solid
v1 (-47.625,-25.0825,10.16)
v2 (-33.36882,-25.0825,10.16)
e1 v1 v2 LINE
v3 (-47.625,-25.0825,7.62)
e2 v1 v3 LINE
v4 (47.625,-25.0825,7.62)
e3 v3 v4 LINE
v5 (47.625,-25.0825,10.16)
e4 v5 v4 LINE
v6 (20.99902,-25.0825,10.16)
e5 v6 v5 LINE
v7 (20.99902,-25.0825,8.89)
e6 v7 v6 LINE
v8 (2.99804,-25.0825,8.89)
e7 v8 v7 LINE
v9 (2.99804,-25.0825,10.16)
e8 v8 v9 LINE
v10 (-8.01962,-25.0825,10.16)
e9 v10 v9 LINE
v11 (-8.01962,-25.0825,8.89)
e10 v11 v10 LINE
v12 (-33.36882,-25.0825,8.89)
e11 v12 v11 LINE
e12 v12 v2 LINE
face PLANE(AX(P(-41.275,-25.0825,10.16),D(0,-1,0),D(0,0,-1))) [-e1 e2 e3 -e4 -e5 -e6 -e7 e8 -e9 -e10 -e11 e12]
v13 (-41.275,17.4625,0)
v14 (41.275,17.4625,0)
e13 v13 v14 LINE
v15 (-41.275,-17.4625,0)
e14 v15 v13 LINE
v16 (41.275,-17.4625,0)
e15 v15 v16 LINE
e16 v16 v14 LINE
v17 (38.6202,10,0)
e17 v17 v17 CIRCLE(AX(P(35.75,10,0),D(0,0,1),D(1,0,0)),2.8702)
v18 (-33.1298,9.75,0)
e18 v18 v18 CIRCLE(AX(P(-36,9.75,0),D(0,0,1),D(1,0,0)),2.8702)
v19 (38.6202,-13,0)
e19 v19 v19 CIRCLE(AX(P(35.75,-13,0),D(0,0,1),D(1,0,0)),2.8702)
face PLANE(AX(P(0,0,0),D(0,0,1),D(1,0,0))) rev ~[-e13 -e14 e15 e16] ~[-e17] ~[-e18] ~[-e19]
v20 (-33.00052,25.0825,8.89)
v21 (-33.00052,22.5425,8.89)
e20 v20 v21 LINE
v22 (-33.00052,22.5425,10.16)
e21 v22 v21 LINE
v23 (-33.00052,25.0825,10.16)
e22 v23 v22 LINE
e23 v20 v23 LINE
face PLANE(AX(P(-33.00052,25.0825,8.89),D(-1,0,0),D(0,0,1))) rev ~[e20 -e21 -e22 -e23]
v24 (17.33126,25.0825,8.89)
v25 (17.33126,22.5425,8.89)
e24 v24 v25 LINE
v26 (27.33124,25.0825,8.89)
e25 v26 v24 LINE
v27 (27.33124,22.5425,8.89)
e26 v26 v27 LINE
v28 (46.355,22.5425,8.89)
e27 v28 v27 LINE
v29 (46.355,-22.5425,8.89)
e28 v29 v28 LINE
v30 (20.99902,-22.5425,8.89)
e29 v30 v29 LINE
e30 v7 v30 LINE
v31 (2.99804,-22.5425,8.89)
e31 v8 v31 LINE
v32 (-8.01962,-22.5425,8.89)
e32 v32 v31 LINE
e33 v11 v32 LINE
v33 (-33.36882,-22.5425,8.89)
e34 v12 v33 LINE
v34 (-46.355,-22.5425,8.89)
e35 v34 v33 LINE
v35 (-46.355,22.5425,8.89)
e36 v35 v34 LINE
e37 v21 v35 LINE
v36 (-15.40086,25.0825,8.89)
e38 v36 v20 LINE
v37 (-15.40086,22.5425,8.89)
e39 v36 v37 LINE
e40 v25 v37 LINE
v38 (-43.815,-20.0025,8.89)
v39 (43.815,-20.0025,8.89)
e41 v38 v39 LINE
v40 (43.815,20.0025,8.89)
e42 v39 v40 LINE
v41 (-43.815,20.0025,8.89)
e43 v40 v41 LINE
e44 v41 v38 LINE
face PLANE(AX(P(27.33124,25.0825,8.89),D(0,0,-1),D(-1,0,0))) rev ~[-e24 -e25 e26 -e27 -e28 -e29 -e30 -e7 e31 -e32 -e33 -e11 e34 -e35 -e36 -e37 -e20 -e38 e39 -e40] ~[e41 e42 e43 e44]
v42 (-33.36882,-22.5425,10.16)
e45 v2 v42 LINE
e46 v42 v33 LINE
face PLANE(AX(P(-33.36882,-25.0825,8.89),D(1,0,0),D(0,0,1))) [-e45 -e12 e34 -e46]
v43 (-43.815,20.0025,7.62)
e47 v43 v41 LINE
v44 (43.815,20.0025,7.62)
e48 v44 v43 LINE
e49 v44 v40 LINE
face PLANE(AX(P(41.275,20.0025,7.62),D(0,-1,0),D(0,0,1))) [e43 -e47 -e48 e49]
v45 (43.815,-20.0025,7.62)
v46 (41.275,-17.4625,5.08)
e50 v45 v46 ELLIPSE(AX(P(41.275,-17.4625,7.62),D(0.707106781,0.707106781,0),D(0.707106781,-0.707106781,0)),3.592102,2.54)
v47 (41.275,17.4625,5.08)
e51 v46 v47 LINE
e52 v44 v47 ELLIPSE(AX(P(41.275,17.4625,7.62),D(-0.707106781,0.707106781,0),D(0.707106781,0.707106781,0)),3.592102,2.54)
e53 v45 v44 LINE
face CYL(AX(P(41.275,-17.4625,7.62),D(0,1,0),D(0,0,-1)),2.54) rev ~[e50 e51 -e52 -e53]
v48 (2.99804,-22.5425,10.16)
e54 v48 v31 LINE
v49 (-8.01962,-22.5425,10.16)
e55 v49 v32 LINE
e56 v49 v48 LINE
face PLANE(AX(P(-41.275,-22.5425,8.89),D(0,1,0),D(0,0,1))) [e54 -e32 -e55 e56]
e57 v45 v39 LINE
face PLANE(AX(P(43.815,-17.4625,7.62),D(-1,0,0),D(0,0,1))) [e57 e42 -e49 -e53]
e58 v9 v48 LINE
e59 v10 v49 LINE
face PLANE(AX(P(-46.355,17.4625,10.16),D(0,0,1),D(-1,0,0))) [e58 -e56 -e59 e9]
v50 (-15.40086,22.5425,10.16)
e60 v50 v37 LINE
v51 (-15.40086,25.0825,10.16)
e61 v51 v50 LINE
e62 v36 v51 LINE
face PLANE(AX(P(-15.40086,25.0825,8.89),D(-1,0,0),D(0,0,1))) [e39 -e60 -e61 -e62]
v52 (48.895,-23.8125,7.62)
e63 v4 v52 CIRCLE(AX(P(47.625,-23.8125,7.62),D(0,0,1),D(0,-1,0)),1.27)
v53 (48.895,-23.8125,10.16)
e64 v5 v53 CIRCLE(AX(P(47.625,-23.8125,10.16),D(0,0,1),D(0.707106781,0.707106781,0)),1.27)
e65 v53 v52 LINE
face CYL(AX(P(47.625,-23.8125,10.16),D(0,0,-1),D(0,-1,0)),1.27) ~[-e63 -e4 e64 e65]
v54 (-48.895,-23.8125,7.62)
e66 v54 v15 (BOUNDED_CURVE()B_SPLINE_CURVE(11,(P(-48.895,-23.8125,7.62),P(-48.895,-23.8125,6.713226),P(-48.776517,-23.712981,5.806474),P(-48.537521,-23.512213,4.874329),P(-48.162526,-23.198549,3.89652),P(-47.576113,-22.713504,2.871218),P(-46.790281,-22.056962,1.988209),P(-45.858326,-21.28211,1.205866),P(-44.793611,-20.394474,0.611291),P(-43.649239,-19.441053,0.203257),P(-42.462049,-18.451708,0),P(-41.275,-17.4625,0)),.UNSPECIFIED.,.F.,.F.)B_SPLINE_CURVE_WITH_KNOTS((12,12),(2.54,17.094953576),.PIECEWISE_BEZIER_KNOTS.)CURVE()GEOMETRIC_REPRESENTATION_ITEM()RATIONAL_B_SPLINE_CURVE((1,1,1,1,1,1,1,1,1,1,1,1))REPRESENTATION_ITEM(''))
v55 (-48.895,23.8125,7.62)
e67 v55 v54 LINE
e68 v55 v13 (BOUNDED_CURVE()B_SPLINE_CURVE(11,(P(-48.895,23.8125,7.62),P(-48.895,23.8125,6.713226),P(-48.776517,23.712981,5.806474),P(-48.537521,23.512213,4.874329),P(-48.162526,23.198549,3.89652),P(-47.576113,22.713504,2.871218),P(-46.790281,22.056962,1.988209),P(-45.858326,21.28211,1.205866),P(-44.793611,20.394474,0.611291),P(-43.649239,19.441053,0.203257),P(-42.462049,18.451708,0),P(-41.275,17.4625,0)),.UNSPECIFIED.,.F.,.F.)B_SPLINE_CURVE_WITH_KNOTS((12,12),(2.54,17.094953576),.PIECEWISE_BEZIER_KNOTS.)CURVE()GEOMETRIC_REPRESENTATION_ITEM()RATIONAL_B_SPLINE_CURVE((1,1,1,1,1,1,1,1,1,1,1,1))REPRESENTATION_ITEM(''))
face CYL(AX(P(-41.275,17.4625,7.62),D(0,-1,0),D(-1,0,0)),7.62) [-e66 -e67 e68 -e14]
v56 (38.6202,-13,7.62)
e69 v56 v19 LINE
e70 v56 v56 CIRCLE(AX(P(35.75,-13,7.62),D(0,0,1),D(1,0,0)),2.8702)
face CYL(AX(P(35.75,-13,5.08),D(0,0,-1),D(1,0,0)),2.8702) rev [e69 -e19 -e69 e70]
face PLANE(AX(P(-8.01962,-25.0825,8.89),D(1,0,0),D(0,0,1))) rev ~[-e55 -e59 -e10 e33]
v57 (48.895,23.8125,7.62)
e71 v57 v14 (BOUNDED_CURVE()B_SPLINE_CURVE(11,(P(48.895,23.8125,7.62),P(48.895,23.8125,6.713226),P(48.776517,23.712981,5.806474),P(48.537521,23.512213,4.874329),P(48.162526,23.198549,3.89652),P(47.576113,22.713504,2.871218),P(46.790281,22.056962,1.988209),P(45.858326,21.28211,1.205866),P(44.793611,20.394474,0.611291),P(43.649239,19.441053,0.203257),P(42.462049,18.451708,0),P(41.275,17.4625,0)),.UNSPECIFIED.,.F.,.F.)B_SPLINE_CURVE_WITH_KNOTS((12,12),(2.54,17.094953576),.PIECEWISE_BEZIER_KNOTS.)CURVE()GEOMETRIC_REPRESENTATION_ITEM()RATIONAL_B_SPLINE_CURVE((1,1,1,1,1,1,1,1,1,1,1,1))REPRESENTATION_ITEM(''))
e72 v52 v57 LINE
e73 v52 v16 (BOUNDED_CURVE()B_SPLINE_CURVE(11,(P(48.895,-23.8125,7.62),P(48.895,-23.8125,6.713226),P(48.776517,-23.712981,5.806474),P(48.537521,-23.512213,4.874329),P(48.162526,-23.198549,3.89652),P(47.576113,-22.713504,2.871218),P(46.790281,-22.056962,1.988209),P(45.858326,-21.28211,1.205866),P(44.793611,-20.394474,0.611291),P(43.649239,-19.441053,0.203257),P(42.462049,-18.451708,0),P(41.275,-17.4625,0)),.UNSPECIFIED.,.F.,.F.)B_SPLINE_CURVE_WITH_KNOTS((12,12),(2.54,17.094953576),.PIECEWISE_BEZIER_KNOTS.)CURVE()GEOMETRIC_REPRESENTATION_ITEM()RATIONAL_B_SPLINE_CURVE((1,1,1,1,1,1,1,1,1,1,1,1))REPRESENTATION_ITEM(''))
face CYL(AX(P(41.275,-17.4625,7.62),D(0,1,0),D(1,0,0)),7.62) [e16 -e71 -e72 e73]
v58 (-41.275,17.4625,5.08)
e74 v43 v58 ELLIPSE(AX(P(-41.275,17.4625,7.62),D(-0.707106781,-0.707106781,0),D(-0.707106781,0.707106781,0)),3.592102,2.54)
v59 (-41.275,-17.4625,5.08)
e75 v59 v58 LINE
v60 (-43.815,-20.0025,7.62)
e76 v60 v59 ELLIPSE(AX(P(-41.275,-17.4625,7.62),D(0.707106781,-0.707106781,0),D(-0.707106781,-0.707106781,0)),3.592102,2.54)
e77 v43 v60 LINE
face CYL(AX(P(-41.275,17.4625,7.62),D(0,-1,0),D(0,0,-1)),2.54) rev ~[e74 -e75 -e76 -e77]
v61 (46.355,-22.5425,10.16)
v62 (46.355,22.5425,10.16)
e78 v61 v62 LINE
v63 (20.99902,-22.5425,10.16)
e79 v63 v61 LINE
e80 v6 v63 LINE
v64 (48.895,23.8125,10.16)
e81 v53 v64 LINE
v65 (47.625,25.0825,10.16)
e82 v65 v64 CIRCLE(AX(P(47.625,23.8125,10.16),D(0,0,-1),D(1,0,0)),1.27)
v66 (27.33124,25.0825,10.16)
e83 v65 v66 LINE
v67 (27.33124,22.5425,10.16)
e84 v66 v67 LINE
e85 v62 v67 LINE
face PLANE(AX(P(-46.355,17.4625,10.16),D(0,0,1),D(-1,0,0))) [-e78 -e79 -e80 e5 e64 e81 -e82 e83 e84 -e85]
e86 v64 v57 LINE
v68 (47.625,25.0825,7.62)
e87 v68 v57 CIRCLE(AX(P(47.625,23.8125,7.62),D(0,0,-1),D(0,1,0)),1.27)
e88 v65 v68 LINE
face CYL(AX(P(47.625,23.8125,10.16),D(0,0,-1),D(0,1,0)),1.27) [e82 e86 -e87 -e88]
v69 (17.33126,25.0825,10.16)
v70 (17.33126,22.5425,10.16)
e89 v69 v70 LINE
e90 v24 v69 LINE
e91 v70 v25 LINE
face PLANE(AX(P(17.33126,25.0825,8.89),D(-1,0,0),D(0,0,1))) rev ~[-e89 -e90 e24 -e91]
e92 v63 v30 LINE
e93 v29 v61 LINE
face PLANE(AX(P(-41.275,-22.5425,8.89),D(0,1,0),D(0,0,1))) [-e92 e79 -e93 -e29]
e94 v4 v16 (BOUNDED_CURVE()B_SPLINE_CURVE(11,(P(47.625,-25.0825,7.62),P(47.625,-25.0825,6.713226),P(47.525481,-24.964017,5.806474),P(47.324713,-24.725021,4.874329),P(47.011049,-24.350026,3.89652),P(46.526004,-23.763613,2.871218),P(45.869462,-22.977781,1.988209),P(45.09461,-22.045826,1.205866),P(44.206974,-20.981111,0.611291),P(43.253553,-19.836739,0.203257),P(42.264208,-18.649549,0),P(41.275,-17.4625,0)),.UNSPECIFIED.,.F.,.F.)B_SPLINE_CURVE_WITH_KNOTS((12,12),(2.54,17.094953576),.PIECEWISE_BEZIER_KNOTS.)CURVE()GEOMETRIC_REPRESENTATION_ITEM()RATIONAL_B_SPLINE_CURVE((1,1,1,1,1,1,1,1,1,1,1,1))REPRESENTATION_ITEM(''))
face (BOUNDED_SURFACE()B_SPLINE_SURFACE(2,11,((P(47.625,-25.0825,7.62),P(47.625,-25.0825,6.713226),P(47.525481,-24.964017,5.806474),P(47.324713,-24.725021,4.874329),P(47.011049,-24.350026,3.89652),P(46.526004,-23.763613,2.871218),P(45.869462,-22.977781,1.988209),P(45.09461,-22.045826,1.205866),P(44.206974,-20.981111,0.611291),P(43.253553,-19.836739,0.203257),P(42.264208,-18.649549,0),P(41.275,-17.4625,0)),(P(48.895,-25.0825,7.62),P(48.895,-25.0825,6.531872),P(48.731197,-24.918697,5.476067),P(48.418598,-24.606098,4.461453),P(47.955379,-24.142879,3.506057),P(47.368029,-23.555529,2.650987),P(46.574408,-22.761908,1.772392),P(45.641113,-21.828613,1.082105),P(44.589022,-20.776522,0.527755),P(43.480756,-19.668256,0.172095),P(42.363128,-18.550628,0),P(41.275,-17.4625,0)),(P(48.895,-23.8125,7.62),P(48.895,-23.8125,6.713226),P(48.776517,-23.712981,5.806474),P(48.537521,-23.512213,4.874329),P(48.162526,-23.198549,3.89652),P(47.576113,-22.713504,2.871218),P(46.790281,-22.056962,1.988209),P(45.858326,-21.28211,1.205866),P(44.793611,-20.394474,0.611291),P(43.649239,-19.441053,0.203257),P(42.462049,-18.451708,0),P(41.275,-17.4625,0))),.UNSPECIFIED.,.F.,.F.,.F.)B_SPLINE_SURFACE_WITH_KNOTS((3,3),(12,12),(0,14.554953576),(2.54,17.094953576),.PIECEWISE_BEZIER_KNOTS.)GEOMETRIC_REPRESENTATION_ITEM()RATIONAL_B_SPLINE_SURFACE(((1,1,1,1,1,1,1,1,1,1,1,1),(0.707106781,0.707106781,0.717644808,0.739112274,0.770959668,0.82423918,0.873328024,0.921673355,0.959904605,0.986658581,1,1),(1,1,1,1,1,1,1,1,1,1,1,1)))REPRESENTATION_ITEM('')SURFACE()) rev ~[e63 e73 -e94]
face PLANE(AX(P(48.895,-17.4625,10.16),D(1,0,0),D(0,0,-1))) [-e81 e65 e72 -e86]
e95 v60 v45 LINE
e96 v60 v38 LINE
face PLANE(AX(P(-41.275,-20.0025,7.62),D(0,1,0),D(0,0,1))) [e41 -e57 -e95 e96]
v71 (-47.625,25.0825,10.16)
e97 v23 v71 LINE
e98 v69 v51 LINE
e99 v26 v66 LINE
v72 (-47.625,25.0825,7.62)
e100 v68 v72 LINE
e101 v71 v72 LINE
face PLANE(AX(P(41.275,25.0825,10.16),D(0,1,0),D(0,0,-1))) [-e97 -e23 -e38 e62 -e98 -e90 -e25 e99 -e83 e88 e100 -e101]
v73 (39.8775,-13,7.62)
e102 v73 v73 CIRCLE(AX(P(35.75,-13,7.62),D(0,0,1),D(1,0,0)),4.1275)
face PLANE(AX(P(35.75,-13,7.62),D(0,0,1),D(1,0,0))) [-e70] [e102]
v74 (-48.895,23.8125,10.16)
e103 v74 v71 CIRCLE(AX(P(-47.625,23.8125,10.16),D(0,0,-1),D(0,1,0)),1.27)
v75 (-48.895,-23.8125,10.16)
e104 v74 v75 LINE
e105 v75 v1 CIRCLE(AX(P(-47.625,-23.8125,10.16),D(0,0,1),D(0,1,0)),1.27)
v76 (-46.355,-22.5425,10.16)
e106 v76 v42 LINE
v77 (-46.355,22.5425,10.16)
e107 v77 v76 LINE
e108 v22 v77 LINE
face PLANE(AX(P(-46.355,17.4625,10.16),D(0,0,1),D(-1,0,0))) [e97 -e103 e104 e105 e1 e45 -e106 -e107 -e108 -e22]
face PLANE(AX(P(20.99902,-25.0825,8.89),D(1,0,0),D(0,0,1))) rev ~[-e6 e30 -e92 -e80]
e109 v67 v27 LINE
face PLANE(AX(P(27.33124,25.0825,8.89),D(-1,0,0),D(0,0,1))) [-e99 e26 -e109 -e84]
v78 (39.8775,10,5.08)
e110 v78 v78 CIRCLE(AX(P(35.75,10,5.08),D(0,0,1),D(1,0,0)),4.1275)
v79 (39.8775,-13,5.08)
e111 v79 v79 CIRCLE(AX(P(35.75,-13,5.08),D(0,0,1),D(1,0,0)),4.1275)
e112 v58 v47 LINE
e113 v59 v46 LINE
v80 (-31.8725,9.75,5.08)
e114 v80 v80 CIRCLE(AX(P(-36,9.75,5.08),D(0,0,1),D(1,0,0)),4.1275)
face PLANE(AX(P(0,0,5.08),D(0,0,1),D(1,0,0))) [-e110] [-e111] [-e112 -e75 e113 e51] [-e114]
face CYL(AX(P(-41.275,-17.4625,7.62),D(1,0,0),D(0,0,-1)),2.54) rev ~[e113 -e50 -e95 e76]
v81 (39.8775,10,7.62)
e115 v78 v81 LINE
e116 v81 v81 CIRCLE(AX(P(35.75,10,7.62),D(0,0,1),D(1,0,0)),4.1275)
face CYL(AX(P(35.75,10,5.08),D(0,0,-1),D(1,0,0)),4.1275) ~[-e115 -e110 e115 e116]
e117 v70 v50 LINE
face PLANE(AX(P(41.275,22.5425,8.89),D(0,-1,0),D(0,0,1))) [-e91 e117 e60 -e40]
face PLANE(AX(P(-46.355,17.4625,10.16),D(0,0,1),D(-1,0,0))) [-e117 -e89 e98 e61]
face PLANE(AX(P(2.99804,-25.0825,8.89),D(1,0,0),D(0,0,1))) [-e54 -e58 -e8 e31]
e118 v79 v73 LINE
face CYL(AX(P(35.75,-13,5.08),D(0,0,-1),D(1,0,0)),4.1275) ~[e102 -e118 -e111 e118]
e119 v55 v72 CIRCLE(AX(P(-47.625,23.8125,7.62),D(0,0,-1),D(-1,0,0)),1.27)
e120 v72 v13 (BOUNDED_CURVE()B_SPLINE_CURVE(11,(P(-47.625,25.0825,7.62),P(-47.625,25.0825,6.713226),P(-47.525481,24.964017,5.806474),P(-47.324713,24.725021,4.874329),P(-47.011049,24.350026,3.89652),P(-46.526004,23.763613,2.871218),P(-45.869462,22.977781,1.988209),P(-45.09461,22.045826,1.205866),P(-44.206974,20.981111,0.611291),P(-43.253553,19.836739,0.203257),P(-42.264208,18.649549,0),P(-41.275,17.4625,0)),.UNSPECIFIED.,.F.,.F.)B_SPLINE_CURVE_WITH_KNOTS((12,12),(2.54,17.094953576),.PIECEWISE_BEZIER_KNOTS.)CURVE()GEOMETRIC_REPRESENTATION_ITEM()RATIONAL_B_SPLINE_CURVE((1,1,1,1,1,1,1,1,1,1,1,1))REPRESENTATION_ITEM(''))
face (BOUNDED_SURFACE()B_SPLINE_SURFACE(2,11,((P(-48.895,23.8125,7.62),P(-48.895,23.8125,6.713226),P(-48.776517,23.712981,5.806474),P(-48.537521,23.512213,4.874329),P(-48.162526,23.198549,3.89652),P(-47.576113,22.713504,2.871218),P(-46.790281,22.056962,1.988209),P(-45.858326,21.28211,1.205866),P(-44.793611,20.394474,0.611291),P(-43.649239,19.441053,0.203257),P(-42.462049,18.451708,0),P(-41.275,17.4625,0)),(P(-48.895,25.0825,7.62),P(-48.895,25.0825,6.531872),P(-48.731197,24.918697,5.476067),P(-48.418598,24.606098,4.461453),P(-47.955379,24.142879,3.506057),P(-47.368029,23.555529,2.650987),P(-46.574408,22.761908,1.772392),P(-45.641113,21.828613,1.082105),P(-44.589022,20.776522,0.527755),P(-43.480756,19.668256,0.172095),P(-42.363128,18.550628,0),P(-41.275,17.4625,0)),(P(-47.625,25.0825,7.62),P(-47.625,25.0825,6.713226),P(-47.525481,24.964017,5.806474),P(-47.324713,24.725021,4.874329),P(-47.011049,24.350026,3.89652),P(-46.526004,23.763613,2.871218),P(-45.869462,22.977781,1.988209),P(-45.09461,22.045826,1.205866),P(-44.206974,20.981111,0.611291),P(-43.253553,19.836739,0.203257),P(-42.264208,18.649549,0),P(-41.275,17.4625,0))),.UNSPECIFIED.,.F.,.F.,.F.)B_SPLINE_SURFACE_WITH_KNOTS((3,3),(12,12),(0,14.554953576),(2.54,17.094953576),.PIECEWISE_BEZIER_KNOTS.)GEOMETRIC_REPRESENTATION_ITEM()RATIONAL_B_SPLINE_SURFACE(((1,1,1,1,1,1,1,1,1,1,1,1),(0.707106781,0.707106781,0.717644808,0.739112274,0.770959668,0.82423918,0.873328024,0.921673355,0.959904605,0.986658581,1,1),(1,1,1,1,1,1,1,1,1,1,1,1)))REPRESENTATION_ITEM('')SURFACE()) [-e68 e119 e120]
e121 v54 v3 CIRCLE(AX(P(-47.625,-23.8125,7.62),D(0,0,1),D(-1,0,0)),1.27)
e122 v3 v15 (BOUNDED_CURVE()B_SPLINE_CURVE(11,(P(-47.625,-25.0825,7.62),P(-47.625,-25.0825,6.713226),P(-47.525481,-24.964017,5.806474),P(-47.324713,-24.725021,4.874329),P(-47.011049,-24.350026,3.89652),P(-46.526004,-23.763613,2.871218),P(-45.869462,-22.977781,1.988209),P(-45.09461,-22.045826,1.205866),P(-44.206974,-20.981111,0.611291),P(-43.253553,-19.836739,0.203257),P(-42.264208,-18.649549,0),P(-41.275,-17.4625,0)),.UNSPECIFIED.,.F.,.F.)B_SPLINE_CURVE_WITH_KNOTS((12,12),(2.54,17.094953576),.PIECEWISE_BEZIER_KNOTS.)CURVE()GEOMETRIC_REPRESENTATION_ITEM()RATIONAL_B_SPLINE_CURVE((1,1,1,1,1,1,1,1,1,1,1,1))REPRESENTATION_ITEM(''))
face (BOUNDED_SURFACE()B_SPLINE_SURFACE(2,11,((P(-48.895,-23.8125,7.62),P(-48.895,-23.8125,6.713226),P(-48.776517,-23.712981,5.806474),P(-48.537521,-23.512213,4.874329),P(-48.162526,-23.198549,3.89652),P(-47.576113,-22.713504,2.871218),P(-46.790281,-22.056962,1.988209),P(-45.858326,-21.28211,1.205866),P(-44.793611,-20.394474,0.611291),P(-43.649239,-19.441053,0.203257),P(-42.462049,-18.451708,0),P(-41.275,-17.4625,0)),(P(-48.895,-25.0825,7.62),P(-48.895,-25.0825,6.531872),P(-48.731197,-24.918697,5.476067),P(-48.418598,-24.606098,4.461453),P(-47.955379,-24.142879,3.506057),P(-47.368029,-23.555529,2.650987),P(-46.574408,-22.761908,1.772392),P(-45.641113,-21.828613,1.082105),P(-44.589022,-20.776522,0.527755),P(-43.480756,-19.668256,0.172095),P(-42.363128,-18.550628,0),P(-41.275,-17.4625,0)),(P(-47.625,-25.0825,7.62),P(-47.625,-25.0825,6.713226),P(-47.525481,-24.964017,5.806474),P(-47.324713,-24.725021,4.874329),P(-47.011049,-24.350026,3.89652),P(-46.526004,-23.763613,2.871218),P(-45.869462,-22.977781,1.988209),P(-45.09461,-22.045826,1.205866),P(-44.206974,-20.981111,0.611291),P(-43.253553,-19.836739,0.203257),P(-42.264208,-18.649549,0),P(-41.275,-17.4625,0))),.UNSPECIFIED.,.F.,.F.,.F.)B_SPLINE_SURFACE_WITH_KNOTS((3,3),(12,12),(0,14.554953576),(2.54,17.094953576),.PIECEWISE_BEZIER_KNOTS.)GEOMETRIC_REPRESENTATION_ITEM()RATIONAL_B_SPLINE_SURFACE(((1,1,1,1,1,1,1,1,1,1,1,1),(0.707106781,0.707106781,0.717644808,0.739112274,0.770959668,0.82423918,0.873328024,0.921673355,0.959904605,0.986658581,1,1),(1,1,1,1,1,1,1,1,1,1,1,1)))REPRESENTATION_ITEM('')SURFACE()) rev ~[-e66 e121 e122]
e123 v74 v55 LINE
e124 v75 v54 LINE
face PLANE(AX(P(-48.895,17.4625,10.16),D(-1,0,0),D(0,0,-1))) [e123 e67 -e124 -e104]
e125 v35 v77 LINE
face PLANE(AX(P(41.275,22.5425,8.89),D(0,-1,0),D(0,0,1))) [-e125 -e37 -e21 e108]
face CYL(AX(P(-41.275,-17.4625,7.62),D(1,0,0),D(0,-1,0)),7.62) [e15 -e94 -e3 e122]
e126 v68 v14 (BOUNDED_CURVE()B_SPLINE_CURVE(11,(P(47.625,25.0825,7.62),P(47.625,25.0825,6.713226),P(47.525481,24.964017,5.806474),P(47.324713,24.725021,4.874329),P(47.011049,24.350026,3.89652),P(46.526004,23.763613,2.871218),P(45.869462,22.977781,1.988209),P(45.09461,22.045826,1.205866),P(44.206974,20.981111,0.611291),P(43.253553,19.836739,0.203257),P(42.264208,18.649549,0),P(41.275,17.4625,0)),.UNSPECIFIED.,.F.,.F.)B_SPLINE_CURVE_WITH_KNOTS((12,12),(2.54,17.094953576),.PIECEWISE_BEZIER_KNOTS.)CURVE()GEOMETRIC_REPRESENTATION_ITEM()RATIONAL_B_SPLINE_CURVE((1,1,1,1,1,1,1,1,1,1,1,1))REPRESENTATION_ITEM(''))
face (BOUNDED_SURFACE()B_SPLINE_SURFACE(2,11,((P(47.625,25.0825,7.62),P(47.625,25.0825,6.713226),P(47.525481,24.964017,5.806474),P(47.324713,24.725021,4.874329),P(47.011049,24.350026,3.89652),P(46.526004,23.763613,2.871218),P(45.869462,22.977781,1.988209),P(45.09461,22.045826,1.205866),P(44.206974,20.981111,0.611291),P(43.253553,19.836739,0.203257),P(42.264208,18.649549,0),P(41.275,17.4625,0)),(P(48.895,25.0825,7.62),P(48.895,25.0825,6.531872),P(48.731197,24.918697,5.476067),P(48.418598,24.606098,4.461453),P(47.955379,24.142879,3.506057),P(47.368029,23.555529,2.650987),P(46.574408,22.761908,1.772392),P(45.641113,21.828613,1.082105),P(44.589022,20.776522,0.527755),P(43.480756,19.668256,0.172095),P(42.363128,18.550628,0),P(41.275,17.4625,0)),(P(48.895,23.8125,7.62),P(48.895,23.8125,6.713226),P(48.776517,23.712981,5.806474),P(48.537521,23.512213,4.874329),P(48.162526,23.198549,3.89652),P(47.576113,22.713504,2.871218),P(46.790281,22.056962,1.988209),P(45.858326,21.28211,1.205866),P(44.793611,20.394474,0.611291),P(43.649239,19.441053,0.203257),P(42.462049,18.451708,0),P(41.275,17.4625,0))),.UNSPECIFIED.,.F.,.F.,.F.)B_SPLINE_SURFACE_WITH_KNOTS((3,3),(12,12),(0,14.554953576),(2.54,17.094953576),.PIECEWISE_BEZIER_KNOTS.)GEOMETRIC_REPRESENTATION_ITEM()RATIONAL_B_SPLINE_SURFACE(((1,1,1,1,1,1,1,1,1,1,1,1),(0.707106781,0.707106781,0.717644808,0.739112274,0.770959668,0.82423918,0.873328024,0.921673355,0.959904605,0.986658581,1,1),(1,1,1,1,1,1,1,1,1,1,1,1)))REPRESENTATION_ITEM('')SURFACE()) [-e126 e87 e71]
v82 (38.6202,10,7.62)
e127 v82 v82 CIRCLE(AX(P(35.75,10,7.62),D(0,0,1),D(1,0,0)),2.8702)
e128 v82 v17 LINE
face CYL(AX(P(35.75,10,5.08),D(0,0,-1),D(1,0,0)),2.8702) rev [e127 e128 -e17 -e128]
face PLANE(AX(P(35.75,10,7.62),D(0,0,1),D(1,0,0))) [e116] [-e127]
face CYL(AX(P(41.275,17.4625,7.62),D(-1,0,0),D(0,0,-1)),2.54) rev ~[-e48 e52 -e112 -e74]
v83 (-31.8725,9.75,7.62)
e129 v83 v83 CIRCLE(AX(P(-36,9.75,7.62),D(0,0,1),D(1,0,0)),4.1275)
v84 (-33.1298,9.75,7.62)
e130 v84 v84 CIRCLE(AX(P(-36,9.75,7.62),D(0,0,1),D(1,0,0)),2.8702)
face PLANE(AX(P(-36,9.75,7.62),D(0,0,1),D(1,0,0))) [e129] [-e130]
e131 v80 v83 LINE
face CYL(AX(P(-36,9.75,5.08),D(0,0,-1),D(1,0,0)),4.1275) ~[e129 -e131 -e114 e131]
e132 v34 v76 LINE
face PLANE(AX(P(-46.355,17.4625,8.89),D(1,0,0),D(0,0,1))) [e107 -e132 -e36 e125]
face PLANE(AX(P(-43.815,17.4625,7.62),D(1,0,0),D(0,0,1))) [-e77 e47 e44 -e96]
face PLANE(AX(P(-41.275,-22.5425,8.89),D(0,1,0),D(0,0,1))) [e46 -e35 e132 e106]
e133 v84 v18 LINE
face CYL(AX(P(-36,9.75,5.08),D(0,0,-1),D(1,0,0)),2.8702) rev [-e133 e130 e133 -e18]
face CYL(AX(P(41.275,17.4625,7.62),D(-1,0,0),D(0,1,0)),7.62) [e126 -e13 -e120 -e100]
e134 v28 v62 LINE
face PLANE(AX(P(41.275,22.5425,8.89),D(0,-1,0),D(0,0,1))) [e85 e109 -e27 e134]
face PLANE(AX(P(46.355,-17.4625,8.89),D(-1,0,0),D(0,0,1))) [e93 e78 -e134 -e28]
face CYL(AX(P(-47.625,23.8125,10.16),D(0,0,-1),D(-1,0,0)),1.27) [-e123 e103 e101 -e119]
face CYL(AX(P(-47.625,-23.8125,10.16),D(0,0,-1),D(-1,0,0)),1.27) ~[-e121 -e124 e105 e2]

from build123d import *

# Parameters (mm, degrees)
F0_W      = 82.55
F0_H      = 34.925
F0_R      = 2.8702
F1_DEPTH  = 5.08
F4_R      = 1.27
F5_W      = 17.59966
F5_H      = 1.27
F5_W_2    = 9.99998
F6_DEPTH  = 3.556
F7_R      = 4.1275
F7_R_2    = 2.8702
F8_DEPTH  = 2.54
F9_W      = 18.00098
F9_H      = 1.27
F9_W_2    = 25.3492
F10_DEPTH = 5.08


with BuildPart() as f1:
    # F0 (on Top) → F1 (new body)
    with BuildSketch(Plane.XY):
        Rectangle(F0_W, F0_H)
        with Locations((35.75, -13)):
            Circle(F0_R, mode=Mode.SUBTRACT)
        with Locations((-36, 9.75)):
            Circle(F0_R, mode=Mode.SUBTRACT)
        with Locations((35.75, 10)):
            Circle(F0_R, mode=Mode.SUBTRACT)
    extrude(amount=F1_DEPTH)

    # F3: sweep along a path in F3_path
    with BuildLine(Plane(origin=(-41.275, 17.4625, 5.08), x_dir=(0, -1, 0), z_dir=(0, 0, -1))) as f3_path:
        Line((0, 0), (34.925, 0))
        Line((34.925, 0), (34.925, -82.55))
        Line((34.925, -82.55), (0, -82.55))
        Line((0, -82.55), (0, 0))
    # F2 (on Front) → F3 (sweep)
    with BuildSketch(Plane.XZ):
        with BuildLine():
            Line((-41.275, 0), (-41.275, 5.08))
            ThreePointArc((-41.275, 5.08), (-43.0710512242, 5.8239487758), (-43.815, 7.62))
            Line((-43.815, 7.62), (-43.815, 8.89))
            Line((-43.815, 8.89), (-46.355, 8.89))
            Line((-46.355, 8.89), (-46.355, 10.16))
            Line((-46.355, 10.16), (-48.895, 10.16))
            Line((-48.895, 10.16), (-48.895, 7.62))
            ThreePointArc((-48.895, 7.62), (-46.6631536726, 2.2318463274), (-41.275, 0))
        make_face()
    sweep(path=f3_path.line, transition=Transition.RIGHT)

    # F4
    f4_edges = [f1.edges().sort_by_distance(p)[0] for p in [
        (46.663154, 22.850654, 2.231846),
        (-46.663154, 22.850654, 2.231846),
        (-46.663154, -22.850654, 2.231846),
        (46.663154, -22.850654, 2.231846),
        (48.895, 25.0825, 8.89),
        (-48.895, 25.0825, 8.89),
        (-48.895, -25.0825, 8.89),
        (48.895, -25.0825, 8.89),
    ]]
    fillet(f4_edges, radius=F4_R)

    # F5 (on face) → F6 (cut)
    with BuildSketch(Plane(origin=(0, 25.0825, 0), x_dir=(-1, 0, 0), z_dir=(0, 1, 0))):
        with Locations((24.20069, 9.525)):
            Rectangle(F5_W, F5_H)
        with Locations((-22.33125, 9.525)):
            Rectangle(F5_W_2, F5_H)
    extrude(amount=-F6_DEPTH, mode=Mode.SUBTRACT)

    # F7 (on face) → F8 (join)
    with BuildSketch(Plane.XY.offset(5.08)):
        with Locations((-36, 9.75)):
            Circle(F7_R)
        with Locations((-36, 9.75)):
            Circle(F7_R_2, mode=Mode.SUBTRACT)
        with Locations((35.75, 10)):
            Circle(F7_R)
        with Locations((35.75, 10)):
            Circle(F7_R_2, mode=Mode.SUBTRACT)
        with Locations((35.75, -13)):
            Circle(F7_R)
        with Locations((35.75, -13)):
            Circle(F7_R_2, mode=Mode.SUBTRACT)
    extrude(amount=F8_DEPTH)

    # F9 (on face) → F10 (cut)
    with BuildSketch(Plane.XZ.offset(25.0825)):
        with Locations((11.99853, 9.525)):
            Rectangle(F9_W, F9_H)
        with Locations((-20.69422, 9.525)):
            Rectangle(F9_W_2, F9_H)
    extrude(amount=-F10_DEPTH, mode=Mode.SUBTRACT)


solid = f1.part
